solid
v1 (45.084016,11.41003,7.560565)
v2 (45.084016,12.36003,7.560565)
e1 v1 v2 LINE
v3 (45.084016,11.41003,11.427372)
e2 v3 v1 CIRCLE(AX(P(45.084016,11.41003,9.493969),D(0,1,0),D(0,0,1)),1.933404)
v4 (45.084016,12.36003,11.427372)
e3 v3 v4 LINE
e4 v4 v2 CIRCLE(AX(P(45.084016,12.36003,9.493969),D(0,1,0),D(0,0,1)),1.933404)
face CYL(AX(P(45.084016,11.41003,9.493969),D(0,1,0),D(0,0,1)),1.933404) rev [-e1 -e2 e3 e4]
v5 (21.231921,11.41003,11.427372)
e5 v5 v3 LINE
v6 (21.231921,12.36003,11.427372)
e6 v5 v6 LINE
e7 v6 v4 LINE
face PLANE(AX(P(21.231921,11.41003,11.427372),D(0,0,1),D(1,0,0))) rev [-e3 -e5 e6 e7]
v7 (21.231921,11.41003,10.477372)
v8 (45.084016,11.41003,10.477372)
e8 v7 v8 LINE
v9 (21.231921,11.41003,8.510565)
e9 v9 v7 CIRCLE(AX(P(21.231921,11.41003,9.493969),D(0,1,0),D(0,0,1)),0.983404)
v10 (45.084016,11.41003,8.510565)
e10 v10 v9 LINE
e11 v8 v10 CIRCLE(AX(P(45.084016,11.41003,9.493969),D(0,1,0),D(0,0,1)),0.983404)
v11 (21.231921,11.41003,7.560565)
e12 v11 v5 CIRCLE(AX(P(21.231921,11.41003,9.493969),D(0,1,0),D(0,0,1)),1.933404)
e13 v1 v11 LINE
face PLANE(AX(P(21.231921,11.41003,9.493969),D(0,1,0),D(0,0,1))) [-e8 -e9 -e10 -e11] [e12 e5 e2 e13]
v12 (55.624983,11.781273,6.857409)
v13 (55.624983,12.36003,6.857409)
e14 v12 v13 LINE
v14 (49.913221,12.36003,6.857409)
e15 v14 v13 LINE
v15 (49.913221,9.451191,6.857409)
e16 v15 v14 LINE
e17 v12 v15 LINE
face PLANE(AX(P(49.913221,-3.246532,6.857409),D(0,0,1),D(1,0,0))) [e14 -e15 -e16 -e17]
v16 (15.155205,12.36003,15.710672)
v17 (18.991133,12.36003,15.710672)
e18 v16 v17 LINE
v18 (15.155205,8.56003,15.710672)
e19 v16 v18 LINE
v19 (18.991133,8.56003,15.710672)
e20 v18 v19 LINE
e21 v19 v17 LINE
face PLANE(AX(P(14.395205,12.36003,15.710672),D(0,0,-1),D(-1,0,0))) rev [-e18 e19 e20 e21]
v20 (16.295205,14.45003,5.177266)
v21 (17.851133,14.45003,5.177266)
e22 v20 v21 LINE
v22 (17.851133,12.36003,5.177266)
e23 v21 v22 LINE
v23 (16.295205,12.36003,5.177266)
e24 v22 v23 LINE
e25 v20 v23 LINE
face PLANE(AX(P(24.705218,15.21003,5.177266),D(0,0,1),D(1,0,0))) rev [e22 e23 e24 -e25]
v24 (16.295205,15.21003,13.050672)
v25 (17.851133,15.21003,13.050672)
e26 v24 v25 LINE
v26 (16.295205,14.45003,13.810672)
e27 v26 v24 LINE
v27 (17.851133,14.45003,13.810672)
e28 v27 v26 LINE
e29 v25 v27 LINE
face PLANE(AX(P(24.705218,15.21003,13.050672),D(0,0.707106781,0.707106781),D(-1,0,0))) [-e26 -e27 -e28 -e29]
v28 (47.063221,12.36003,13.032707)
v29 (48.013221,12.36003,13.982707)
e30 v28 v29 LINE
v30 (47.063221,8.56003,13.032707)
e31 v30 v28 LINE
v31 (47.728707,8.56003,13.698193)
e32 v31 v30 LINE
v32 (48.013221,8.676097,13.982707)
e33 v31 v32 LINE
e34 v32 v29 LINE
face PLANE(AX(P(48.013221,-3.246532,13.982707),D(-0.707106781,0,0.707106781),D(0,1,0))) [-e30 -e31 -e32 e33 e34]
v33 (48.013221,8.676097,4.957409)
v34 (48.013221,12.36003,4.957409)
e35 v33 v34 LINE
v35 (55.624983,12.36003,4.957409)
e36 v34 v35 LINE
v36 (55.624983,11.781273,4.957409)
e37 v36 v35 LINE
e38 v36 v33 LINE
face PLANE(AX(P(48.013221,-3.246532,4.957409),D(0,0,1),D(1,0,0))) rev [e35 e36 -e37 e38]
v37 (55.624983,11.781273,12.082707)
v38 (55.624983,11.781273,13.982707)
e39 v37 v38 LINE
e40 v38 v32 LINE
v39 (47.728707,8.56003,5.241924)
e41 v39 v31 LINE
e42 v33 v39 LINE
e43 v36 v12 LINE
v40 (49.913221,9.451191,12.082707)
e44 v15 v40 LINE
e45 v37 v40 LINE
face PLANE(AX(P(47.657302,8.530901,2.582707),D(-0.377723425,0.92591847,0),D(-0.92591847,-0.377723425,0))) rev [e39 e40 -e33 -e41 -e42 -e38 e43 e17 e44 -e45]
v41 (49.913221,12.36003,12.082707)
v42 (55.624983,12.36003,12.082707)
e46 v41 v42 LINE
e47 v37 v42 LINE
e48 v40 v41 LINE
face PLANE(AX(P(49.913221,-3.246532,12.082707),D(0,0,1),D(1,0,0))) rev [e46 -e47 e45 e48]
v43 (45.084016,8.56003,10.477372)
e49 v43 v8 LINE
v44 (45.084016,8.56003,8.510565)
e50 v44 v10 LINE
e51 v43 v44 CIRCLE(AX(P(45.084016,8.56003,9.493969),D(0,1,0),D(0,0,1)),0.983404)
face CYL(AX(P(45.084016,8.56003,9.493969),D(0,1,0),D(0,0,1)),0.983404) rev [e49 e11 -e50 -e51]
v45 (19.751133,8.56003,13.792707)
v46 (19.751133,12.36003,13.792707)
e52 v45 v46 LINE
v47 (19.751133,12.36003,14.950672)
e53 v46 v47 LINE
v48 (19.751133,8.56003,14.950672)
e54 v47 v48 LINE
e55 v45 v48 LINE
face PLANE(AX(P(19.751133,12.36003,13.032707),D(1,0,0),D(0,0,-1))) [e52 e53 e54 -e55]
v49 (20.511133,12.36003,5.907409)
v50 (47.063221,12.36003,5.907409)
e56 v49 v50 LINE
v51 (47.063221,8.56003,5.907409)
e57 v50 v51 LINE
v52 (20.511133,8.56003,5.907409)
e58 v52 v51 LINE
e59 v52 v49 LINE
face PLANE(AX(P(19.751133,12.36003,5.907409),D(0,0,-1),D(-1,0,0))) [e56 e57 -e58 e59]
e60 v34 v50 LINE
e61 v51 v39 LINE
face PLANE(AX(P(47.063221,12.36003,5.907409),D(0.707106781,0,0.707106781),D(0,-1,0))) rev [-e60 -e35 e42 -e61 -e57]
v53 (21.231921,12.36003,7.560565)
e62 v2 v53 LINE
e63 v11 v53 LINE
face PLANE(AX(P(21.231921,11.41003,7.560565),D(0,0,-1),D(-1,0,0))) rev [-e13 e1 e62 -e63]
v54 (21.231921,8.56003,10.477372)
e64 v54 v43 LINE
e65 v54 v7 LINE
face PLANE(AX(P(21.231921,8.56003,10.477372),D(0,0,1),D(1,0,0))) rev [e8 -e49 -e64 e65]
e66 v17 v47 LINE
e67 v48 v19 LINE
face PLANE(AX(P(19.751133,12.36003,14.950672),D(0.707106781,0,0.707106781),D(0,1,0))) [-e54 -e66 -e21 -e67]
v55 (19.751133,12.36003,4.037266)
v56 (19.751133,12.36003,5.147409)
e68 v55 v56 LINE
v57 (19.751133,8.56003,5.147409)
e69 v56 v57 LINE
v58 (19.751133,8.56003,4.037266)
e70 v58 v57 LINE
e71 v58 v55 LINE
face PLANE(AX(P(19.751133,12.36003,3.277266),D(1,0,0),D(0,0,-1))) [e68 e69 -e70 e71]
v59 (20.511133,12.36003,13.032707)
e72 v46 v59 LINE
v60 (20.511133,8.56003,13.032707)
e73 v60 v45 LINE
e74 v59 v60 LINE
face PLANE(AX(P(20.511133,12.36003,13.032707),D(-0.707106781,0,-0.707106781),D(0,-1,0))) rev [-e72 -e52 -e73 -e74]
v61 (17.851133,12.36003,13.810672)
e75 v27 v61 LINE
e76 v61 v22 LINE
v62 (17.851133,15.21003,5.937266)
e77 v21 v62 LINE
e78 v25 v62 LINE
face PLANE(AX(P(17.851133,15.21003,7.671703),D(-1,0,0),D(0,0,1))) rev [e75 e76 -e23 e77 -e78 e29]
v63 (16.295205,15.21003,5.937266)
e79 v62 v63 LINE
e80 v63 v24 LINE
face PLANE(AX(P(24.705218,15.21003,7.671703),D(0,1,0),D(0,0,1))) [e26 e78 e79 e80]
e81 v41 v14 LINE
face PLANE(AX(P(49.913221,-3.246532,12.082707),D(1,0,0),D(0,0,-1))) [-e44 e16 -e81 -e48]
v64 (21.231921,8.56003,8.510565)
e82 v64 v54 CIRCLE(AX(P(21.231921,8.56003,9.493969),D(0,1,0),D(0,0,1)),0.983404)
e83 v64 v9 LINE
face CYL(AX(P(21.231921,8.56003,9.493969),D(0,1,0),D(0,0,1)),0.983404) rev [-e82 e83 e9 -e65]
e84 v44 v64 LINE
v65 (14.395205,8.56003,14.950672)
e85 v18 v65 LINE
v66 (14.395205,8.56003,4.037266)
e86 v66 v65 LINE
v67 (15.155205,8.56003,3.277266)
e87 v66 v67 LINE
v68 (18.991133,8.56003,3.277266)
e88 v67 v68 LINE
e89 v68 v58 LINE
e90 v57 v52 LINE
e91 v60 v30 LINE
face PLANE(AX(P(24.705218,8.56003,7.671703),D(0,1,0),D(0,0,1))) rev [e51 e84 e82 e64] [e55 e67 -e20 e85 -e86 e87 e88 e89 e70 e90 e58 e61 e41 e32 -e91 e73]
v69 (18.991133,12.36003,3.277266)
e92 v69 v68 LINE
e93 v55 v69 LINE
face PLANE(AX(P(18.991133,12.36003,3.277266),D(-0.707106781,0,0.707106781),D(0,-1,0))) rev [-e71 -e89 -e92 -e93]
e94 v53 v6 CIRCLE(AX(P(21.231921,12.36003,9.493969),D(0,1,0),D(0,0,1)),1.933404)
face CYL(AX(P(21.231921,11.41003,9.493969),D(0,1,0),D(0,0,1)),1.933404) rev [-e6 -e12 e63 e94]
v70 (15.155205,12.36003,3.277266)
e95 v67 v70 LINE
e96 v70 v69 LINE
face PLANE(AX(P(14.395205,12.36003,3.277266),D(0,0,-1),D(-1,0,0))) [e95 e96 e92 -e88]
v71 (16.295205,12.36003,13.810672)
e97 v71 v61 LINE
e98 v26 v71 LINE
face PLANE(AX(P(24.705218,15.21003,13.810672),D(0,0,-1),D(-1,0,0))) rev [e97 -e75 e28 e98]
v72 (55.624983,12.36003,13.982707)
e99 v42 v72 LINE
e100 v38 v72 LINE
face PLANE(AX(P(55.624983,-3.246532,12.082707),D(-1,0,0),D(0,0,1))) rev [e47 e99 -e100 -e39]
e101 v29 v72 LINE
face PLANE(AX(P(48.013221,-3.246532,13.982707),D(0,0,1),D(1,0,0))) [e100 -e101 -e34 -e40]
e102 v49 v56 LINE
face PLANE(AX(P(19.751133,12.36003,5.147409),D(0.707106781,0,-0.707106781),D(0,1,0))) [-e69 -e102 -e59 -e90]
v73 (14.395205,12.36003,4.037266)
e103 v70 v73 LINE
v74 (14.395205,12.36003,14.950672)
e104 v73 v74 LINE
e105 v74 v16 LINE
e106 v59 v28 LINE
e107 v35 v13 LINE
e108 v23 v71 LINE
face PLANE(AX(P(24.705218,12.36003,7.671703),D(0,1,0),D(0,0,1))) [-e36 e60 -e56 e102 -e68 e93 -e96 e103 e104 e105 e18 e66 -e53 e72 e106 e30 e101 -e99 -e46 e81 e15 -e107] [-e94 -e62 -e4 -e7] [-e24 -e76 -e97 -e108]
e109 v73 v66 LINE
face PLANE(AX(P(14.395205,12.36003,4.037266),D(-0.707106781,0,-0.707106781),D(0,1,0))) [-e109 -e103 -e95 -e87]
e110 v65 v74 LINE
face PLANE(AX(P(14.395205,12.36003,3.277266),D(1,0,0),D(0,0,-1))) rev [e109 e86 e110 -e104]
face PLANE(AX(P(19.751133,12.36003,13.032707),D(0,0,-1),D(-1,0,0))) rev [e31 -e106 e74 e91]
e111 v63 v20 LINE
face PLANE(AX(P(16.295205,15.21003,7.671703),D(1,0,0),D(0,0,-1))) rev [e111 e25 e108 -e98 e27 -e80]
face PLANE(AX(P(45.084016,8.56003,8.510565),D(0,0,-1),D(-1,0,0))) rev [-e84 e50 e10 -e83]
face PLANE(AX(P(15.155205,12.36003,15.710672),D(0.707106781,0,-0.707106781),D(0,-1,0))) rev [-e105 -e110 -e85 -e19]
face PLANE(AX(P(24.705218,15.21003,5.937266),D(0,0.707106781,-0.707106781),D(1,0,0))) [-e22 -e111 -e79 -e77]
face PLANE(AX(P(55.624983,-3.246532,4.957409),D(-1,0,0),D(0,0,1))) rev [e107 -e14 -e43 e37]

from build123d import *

# Parameters (mm, degrees)
BOSS_EXTRUDE1_DEPTH = 20
CUT_EXTRUDE1_DEPTH  = 5
CUT_EXTRUDE2_DEPTH  = 132.297386022
CHAMFER1_SIZE       = 4
BOSS_EXTRUDE2_DEPTH = 15
CHAMFER2_SIZE       = 4
BOSS_EXTRUDE3_DEPTH = 20
CHAMFER3_SIZE       = 5
CUT_EXTRUDE3_DEPTH  = 60
SCALE2_SCALE        = 0.19


with BuildPart() as part:
    # Sketch1 → Boss-Extrude1 (new body)
    with BuildSketch(Plane(origin=(0, 0, 0), x_dir=(1, 0, 0), z_dir=(0, 1, 0))):
        Polygon((-26.074130493, -28.215811716), (-26.074130493, -42.310360901), (-54.263228862, -42.310360901), (-54.263228862, 23.128617456), (-26.074130493, 23.128617456), (-26.074130493, 9.28575665), (122.67370108, 9.28575665), (122.67370108, -28.215811716), align=None)
    extrude(amount=BOSS_EXTRUDE1_DEPTH)

    # Sketch2 → Cut-Extrude1 (cut)
    with BuildSketch(Plane(origin=(0, 20, 0), x_dir=(1, 0, 0), z_dir=(0, 1, 0))):
        with BuildLine():
            Line((-18.280512059, 0.584936596), (107.256828457, 0.584936596))
            ThreePointArc((107.256828457, 0.584936596), (117.432636776, -9.590871723), (107.256828457, -19.766680041))
            Line((107.256828457, -19.766680041), (-18.280512059, -19.766680041))
            ThreePointArc((-18.280512059, -19.766680041), (-28.456320377, -9.590871723), (-18.280512059, 0.584936596))
        make_face()
        with BuildLine():
            Line((-18.280512059, -4.415063404), (107.256828457, -4.415063404))
            ThreePointArc((107.256828457, -4.415063404), (112.432636776, -9.590871723), (107.256828457, -14.766680041))
            Line((107.256828457, -14.766680041), (-18.280512059, -14.766680041))
            ThreePointArc((-18.280512059, -14.766680041), (-23.456320377, -9.590871723), (-18.280512059, -4.415063404))
        make_face(mode=Mode.SUBTRACT)
    extrude(amount=-CUT_EXTRUDE1_DEPTH, mode=Mode.SUBTRACT)

    # Sketch3 → Cut-Extrude2 (cut, through all)
    with BuildSketch(Plane(origin=(0, 20, 0), x_dir=(1, 0, 0), z_dir=(0, 1, 0))):
        with BuildLine():
            Line((-18.280512059, -14.766680041), (107.256828457, -14.766680041))
            ThreePointArc((107.256828457, -14.766680041), (112.432636776, -9.590871723), (107.256828457, -4.415063404))
            Line((107.256828457, -4.415063404), (-18.280512059, -4.415063404))
            ThreePointArc((-18.280512059, -4.415063404), (-23.456320377, -9.590871723), (-18.280512059, -14.766680041))
        make_face()
    extrude(amount=-CUT_EXTRUDE2_DEPTH, mode=Mode.SUBTRACT)

    # Chamfer1
    chamfer1_edges = [part.edges().sort_by_distance(p)[0] for p in [
        (-26.074130493, 10, 28.215811716),
        (-26.074130493, 10, -9.28575665),
        (-26.074130493, 10, -23.128617456),
        (-54.263228862, 10, -23.128617456),
        (-54.263228862, 10, 42.310360901),
        (-26.074130493, 10, 42.310360901),
    ]]
    chamfer(chamfer1_edges, length=CHAMFER1_SIZE)

    # Sketch4 → Boss-Extrude2 (add)
    with BuildSketch(Plane(origin=(0, 20, 0), x_dir=(1, 0, 0), z_dir=(0, 1, 0))):
        Polygon((-36.074130493, -32.215811716), (-36.074130493, 13.128617456), (-44.263228862, 13.128617456), (-44.263228862, -32.310360901), (-36.074130493, -32.310360901), align=None)
    extrude(amount=BOSS_EXTRUDE2_DEPTH)

    # Chamfer2
    chamfer2_edges = [part.edges().sort_by_distance(p)[0] for p in [
        (-40.168679677, 35, -13.128617456),
        (-40.168679677, 35, 32.310360901),
    ]]
    chamfer(chamfer2_edges, length=CHAMFER2_SIZE)

    # Sketch5 → Boss-Extrude3 (add)
    with BuildSketch(Plane(origin=(0, 20, 0), x_dir=(1, 0, 0), z_dir=(0, 1, 0))):
        Polygon((122.67370108, -33.215811716), (162.735602204, -33.215811716), (162.735602204, -23.215811716), (132.67370108, -23.215811716), (132.67370108, 4.28575665), (162.735602204, 4.28575665), (162.735602204, 14.28575665), (122.67370108, 14.28575665), align=None)
    extrude(amount=-BOSS_EXTRUDE3_DEPTH)

    # Chamfer3
    chamfer3_edges = [part.edges().sort_by_distance(p)[0] for p in [
        (122.67370108, 10, -9.28575665),
        (122.67370108, 10, 28.215811716),
    ]]
    chamfer(chamfer3_edges, length=CHAMFER3_SIZE - 0.0001)  # a hair under: the kernel refuses the full size

    # Sketch6 → Cut-Extrude3 (cut)
    with BuildSketch(Plane.XY.offset(33.215811716)):
        Polygon((120.800441338, -0.153311602), (162.735602204, 16.953910153), (162.735602204, 0), align=None)
    extrude(amount=-CUT_EXTRUDE3_DEPTH, mode=Mode.SUBTRACT)


with BuildPart() as part_1:
    # Scale2: scaled about (30.500255958, 10.567938769, 9.471238373)
    add(part.part.scale(SCALE2_SCALE).moved(Location((24.705207326, 8.560030403, 7.671703082))))


solid = part_1.part
